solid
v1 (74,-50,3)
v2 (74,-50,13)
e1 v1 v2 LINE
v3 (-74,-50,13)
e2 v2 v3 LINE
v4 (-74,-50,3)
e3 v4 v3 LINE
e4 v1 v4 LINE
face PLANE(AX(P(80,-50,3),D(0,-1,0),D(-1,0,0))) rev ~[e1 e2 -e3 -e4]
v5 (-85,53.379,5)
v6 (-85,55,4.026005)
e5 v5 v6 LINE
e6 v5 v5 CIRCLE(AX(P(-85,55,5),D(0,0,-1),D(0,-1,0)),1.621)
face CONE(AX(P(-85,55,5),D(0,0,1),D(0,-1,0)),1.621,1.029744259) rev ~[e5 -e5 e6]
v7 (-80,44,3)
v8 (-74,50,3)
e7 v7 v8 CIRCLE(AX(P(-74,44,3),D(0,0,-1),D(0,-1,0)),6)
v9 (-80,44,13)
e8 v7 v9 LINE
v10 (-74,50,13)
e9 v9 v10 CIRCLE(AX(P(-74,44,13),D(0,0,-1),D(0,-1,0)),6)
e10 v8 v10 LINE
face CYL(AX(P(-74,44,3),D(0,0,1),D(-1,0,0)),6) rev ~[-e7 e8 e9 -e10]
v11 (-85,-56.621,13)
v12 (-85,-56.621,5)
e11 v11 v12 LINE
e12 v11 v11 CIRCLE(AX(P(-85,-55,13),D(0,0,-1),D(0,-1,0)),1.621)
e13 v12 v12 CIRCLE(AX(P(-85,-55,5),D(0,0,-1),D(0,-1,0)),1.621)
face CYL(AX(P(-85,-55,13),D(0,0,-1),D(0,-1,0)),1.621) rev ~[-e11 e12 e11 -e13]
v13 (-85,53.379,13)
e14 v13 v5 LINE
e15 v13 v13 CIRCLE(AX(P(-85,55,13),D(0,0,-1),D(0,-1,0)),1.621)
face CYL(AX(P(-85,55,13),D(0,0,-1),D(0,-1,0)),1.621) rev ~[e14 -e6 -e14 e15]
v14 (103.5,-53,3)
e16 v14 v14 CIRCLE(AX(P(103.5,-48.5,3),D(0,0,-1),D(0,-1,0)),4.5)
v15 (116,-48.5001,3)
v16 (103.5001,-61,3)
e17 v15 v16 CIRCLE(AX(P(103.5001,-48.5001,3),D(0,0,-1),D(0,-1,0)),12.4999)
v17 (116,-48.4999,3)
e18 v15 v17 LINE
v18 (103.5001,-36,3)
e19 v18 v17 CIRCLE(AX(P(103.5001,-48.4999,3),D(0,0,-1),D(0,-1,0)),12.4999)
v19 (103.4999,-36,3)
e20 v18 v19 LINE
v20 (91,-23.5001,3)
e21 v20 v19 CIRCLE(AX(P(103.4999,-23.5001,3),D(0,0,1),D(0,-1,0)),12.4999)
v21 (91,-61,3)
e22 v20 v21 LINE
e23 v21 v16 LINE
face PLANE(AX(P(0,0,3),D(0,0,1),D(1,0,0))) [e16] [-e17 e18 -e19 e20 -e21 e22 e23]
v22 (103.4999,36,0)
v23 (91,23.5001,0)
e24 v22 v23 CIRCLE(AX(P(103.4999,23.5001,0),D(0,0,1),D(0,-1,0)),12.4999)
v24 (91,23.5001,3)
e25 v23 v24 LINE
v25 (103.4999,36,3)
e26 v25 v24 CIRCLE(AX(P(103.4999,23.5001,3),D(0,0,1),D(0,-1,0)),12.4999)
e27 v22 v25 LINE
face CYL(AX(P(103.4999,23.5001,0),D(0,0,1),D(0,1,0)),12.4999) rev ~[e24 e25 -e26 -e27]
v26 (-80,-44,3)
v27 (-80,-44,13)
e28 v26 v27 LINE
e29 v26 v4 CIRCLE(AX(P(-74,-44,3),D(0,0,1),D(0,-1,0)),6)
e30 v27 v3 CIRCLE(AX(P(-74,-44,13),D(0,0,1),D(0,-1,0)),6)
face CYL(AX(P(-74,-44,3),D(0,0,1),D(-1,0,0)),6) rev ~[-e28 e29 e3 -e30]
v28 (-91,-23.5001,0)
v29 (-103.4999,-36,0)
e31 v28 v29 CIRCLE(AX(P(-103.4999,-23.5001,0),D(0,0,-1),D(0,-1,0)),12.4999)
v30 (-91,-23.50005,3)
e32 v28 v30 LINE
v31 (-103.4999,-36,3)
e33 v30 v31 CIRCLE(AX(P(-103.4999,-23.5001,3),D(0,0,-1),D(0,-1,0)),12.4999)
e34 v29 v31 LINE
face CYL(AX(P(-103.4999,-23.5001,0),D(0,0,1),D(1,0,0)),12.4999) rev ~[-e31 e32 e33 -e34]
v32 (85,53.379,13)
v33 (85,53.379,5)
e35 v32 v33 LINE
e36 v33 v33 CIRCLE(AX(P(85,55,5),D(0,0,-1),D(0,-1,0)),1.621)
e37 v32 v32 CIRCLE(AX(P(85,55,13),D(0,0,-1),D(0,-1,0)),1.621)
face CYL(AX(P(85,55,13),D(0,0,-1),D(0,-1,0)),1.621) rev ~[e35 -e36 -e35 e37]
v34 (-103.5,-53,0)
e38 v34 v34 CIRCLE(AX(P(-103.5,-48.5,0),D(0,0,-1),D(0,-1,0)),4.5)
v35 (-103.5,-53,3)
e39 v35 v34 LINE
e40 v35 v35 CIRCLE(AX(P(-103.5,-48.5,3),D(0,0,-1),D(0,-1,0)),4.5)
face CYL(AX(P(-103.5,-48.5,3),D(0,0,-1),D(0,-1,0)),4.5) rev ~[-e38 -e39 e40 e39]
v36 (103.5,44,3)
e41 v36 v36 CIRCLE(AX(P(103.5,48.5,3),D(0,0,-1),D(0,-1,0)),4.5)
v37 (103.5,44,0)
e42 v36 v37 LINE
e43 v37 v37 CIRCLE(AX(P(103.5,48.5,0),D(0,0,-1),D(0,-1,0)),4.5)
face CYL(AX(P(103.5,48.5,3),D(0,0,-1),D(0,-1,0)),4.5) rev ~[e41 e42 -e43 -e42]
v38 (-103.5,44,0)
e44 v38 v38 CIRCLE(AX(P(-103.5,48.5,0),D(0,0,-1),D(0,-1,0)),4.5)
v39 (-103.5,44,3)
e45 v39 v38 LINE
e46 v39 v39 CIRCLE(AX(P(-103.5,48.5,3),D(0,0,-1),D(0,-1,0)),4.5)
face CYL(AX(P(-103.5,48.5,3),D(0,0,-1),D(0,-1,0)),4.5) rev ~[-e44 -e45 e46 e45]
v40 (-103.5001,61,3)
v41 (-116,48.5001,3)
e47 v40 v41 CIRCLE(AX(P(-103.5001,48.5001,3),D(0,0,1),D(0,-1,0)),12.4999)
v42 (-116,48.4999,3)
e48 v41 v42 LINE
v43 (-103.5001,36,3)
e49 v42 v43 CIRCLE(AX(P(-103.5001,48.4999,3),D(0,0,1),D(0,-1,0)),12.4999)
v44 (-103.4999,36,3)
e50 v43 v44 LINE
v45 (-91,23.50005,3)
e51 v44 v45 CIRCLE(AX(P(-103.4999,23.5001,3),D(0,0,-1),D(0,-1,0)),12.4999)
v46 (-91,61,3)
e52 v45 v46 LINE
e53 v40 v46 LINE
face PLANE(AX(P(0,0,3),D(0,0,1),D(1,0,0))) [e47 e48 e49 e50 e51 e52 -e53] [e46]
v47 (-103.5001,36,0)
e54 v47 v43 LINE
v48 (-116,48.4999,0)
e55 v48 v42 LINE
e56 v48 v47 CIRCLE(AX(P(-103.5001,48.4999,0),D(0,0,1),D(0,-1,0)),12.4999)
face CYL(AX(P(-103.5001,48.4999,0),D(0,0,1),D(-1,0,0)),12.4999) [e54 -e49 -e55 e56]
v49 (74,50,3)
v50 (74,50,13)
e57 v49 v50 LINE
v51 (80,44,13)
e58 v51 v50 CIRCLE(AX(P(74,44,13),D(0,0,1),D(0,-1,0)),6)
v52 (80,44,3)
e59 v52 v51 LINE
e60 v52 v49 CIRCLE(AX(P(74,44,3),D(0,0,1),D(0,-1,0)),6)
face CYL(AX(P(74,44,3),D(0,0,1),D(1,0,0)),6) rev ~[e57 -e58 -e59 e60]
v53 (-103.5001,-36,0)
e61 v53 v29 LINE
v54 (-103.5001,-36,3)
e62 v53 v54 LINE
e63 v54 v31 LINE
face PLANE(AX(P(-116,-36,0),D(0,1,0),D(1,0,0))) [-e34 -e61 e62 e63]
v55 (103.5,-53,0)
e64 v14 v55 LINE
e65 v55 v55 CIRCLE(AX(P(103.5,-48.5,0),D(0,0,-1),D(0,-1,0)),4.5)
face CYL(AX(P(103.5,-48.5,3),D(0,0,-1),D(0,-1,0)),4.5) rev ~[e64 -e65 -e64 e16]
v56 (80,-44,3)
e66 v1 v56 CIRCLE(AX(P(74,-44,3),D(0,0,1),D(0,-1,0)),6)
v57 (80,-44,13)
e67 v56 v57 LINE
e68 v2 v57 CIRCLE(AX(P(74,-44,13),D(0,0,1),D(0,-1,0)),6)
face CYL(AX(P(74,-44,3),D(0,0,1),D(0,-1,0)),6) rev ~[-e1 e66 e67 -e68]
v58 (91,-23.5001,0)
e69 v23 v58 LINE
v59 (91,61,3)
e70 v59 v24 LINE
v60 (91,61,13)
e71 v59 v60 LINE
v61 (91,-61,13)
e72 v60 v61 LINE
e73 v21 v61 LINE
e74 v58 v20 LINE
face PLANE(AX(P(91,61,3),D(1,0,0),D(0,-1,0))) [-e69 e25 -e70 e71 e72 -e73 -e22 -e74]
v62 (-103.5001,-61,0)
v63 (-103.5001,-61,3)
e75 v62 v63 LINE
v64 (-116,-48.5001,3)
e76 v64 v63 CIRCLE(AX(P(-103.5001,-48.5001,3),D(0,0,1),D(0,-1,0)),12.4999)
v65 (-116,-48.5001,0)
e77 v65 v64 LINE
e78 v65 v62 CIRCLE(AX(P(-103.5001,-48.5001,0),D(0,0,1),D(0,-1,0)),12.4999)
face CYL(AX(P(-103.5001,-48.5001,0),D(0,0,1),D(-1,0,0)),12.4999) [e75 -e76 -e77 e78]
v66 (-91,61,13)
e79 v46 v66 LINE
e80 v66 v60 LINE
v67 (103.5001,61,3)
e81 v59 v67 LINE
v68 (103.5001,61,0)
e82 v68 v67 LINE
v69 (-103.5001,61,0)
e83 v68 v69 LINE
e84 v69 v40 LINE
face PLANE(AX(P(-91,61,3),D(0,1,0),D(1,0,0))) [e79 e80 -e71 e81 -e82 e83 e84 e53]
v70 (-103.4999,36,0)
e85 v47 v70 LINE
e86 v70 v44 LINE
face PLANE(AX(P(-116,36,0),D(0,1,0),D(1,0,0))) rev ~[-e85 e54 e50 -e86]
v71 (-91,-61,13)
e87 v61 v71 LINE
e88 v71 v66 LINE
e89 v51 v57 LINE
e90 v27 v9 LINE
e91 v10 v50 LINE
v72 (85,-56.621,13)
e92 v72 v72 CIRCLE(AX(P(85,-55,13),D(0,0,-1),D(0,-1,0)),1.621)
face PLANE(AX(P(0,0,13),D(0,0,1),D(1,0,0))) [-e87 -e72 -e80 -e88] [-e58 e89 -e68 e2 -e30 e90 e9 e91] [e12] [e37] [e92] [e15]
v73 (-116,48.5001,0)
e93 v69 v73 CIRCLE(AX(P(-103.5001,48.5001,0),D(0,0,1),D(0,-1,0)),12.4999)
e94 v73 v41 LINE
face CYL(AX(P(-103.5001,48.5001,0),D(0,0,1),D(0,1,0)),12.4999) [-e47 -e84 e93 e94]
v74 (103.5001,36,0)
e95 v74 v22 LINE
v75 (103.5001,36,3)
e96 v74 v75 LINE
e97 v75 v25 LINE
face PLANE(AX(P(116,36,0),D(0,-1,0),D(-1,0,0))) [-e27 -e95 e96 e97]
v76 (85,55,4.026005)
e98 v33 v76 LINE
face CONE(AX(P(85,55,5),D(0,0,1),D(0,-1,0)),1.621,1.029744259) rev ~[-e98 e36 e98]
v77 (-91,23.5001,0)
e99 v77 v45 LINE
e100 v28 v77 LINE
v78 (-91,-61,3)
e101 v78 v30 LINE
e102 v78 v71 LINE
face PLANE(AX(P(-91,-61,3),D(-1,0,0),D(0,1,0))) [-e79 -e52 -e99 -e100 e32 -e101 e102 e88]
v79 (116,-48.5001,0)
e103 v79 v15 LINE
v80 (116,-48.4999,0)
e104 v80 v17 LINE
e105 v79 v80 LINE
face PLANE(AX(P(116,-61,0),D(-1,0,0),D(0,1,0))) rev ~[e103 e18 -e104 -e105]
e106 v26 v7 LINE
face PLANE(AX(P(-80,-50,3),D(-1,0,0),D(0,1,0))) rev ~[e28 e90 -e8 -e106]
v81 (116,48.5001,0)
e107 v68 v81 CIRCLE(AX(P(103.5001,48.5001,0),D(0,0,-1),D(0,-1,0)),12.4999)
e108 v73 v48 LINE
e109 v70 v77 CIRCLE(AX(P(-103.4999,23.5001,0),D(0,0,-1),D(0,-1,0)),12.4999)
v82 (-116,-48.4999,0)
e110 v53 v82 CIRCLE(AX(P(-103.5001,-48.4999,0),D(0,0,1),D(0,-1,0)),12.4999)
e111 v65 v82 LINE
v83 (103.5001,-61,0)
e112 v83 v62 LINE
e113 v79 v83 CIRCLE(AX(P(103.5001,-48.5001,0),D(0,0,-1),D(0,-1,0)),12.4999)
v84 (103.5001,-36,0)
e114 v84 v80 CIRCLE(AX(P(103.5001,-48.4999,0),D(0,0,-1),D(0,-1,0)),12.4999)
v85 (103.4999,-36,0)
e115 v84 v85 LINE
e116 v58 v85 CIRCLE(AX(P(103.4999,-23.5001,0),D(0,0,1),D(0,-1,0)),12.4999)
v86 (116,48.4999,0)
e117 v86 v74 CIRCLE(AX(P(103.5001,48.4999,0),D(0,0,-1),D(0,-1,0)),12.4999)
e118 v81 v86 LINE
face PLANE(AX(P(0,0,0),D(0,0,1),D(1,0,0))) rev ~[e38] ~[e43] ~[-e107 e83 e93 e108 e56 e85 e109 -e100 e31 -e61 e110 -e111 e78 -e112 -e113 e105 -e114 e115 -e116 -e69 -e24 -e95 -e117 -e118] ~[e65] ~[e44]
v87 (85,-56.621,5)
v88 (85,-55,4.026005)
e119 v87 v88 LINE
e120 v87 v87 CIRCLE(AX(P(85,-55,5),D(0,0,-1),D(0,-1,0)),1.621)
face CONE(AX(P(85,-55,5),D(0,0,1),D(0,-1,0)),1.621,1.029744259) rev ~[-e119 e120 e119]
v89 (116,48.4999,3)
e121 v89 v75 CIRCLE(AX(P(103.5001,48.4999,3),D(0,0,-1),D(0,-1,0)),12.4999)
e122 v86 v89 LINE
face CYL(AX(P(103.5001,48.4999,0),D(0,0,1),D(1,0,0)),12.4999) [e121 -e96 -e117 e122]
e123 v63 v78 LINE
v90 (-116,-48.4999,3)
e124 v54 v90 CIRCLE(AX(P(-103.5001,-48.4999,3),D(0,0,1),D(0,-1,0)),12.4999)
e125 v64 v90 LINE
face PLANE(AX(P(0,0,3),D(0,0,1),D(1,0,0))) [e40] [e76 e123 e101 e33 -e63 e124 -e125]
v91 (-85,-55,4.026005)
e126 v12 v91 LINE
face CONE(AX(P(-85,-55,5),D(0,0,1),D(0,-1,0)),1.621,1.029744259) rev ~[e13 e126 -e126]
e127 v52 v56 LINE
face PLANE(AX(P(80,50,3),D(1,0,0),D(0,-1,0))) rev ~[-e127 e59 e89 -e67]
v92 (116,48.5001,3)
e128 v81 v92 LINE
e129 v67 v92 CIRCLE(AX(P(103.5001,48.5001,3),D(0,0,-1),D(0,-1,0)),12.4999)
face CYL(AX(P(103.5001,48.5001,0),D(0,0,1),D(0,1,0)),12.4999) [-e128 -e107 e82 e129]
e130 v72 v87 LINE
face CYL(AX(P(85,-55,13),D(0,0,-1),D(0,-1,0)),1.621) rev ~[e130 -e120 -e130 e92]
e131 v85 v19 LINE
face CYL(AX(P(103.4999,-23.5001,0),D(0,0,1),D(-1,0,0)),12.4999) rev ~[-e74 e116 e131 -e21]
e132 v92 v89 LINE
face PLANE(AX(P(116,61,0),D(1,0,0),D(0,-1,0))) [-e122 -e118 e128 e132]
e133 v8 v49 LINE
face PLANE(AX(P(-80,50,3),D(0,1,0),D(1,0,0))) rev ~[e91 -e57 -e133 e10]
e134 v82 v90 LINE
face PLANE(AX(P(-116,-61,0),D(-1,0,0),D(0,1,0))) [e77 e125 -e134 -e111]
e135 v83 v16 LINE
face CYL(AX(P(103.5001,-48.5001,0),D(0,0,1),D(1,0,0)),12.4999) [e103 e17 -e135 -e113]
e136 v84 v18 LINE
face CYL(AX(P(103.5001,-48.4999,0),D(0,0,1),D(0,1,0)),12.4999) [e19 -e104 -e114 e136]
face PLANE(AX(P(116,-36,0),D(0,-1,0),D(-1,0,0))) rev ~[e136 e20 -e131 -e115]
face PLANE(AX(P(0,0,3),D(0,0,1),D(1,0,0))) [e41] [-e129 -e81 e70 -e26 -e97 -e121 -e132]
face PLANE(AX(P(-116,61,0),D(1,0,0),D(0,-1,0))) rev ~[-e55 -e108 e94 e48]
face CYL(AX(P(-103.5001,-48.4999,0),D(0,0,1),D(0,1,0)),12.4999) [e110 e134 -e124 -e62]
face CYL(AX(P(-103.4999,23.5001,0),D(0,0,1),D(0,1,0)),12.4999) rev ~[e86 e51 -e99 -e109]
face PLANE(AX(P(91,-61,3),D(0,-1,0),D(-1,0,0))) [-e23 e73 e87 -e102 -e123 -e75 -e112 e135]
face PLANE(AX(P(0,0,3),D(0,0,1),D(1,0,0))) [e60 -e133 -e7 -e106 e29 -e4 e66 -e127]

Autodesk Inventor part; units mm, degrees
ref_plane "YZ Plane" through (0, 0, 0) normal (1, 0, 0) x (0, 1, 0)
ref_plane "XZ Plane" through (0, 0, 0) normal (0, 1, 0) x (-1, 0, 0)
ref_plane "XY Plane" through (0, 0, 0) normal (0, 0, 1) x (1, 0, 0)
sketch "Sketch1" plane through (0, 0, 0) normal (0, 0, 1) x (1, 0, 0)
  line L0 (-83, 53) -> (83, 53) construction
  line L1 (83, 53) -> (83, -53) construction
  line L2 (83, -53) -> (-83, -53) construction
  line L3 (-83, -53) -> (-83, 53) construction
  line L4 (-83, -53) -> (83, 53) construction
  line L5 (83, -53) -> (-83, 53) construction
  line L6 (-91, 61) -> (91, 61)
  line L7 (91, 61) -> (91, -61)
  line L8 (91, -61) -> (-91, -61)
  line L9 (-91, -61) -> (-91, 61)
  line L10 (-91, 61) -> (91, -61) construction
  line L11 (-91, -61) -> (91, 61) construction
  line L12 (-91, 61) -> (-116, 61)
  line L13 (-116, 61) -> (-116, 36)
  line L14 (-116, 36) -> (-91, 36)
  line L15 (-91, 36) -> (-91, 61)
  line L16 (0, 0) -> (-160.1953, 0) construction
  line L17 (-91, -61) -> (-116, -61)
  line L18 (-116, -61) -> (-116, -36)
  line L19 (-116, -36) -> (-91, -36)
  line L20 (-91, -36) -> (-91, -61)
  line L21 (0, 0) -> (0, 107.5555) construction
  line L22 (91, -61) -> (91, 61)
  line L23 (91, 61) -> (116, 61)
  line L24 (116, 61) -> (116, 36)
  line L25 (116, 36) -> (91, 36)
  line L26 (91, 36) -> (91, 61)
  line L27 (91, -36) -> (91, -61)
  line L28 (91, -61) -> (116, -61)
  line L29 (116, -61) -> (116, -36)
  line L30 (116, -36) -> (91, -36)
  point P0 (0, 0)
  point P1 (0, 0)
  dimension "d0" = 166
  dimension "d1" = 106
  dimension "d2" = 8
  dimension "d3" = 8
  dimension "d4" = 25
  dimension "d5" = 25
extrude "Extrusion1" add sketch "Sketch1" along normal blind 3
sketch "Sketch2" plane through (0, 0, 3) normal (0, 0, 1) x (1, 0, 0)
  line L0 (-116, 61) -> (116, 61) projected
  line L1 (-116, 36) -> (-116, 61) projected
  line L2 (116, 61) -> (116, 36) projected
  circle A0 centre (-103.5, 48.5) radius 1
  line L3 (0, 0) -> (-24.3275, 0) construction
  line L4 (0, 0) -> (0, 26.5856) construction
  circle A1 centre (-103.5, -48.5) radius 1
  circle A2 centre (103.5, 48.5) radius 1
  circle A3 centre (103.5, -48.5) radius 1
  dimension "d8" = 2
  dimension "d9" = 12.5
  dimension "d10" = 12.5
hole "Hole1" at (-103.5, 48.5, 3) at (-103.5, -48.5, 3) at (103.5, -48.5, 3) at (103.5, 48.5, 3) direction (0, 0, -1) diameter 9 depth 8 tip angle 118 clearance for "Flat Head Machine Screw" size "M8" standard "Ansi Metric M Profile"
fillet "Fillet1" radius 12.5 12 edges at (116, 61, 1.5) (116, 36, 1.5) (91, 36, 1.5) (91, -36, 1.5) (116, -36, 1.5) (116, -61, 1.5) (-116, -61, 1.5) (-116, -36, 1.5) (-91, -36, 1.5) (-91, 36, 1.5) (-116, 36, 1.5) (-116, 61, 1.5)
sketch "Sketch3" plane through (0, 0, 3) normal (0, 0, 1) x (1, 0, 0)
  line L0 (103.5, -61) -> (-103.5, -61) projected
  line L1 (-103.5, 61) -> (103.5, 61) projected
  line L2 (-91, 61) -> (91, 61)
  line L3 (91, 61) -> (91, -61)
  line L4 (91, -61) -> (-91, -61)
  line L5 (-91, -61) -> (-91, 61)
  line L6 (-80, 50) -> (80, 50)
  line L7 (80, 50) -> (80, -50)
  line L8 (80, -50) -> (-80, -50)
  line L9 (-80, -50) -> (-80, 50)
  line L10 (-80, 50) -> (80, -50) construction
  line L11 (-80, -50) -> (80, 50) construction
  line L12 (-91, -23.5) -> (-91, 23.5) projected
  point P0 (0, 0)
  dimension "d19" = 100
  dimension "d20" = 160
extrude "Extrusion2" add sketch "Sketch3" along normal blind 10
fillet "Fillet2" radius 6 4 edges at (-80, 50, 8) (-80, -50, 8) (80, -50, 8) (80, 50, 8)
sketch "Sketch6" plane through (0, 0, 13) normal (0, 0, 1) x (1, 0, 0)
  line L0 (-91, 61) -> (91, 61) projected
  line L1 (-91, -61) -> (-91, 61) projected
  circle A0 centre (-85, 55) radius 2
  line L2 (0, 0) -> (-11.4122, 0) construction
  line L3 (0, 0) -> (0, 13.6861) construction
  circle A1 centre (-85, -55) radius 2
  circle A2 centre (85, 55) radius 2
  circle A3 centre (85, -55) radius 2
  dimension "d33" = 4
  dimension "d34" = 6
  dimension "d35" = 6
hole "Hole2" at (-85, 55, 13) at (-85, -55, 13) at (85, -55, 13) at (85, 55, 13) direction (0, 0, -1) diameter 3.242 depth 8 tip angle 118 thread size "M4x0.7" class "6H" standard "ANSI Metric M Profile"
equation "\"d34\" = 1.5 * d33"
equation "\"d35\" = 1.5 * d33"
properties part number "Base.Box.Base"
